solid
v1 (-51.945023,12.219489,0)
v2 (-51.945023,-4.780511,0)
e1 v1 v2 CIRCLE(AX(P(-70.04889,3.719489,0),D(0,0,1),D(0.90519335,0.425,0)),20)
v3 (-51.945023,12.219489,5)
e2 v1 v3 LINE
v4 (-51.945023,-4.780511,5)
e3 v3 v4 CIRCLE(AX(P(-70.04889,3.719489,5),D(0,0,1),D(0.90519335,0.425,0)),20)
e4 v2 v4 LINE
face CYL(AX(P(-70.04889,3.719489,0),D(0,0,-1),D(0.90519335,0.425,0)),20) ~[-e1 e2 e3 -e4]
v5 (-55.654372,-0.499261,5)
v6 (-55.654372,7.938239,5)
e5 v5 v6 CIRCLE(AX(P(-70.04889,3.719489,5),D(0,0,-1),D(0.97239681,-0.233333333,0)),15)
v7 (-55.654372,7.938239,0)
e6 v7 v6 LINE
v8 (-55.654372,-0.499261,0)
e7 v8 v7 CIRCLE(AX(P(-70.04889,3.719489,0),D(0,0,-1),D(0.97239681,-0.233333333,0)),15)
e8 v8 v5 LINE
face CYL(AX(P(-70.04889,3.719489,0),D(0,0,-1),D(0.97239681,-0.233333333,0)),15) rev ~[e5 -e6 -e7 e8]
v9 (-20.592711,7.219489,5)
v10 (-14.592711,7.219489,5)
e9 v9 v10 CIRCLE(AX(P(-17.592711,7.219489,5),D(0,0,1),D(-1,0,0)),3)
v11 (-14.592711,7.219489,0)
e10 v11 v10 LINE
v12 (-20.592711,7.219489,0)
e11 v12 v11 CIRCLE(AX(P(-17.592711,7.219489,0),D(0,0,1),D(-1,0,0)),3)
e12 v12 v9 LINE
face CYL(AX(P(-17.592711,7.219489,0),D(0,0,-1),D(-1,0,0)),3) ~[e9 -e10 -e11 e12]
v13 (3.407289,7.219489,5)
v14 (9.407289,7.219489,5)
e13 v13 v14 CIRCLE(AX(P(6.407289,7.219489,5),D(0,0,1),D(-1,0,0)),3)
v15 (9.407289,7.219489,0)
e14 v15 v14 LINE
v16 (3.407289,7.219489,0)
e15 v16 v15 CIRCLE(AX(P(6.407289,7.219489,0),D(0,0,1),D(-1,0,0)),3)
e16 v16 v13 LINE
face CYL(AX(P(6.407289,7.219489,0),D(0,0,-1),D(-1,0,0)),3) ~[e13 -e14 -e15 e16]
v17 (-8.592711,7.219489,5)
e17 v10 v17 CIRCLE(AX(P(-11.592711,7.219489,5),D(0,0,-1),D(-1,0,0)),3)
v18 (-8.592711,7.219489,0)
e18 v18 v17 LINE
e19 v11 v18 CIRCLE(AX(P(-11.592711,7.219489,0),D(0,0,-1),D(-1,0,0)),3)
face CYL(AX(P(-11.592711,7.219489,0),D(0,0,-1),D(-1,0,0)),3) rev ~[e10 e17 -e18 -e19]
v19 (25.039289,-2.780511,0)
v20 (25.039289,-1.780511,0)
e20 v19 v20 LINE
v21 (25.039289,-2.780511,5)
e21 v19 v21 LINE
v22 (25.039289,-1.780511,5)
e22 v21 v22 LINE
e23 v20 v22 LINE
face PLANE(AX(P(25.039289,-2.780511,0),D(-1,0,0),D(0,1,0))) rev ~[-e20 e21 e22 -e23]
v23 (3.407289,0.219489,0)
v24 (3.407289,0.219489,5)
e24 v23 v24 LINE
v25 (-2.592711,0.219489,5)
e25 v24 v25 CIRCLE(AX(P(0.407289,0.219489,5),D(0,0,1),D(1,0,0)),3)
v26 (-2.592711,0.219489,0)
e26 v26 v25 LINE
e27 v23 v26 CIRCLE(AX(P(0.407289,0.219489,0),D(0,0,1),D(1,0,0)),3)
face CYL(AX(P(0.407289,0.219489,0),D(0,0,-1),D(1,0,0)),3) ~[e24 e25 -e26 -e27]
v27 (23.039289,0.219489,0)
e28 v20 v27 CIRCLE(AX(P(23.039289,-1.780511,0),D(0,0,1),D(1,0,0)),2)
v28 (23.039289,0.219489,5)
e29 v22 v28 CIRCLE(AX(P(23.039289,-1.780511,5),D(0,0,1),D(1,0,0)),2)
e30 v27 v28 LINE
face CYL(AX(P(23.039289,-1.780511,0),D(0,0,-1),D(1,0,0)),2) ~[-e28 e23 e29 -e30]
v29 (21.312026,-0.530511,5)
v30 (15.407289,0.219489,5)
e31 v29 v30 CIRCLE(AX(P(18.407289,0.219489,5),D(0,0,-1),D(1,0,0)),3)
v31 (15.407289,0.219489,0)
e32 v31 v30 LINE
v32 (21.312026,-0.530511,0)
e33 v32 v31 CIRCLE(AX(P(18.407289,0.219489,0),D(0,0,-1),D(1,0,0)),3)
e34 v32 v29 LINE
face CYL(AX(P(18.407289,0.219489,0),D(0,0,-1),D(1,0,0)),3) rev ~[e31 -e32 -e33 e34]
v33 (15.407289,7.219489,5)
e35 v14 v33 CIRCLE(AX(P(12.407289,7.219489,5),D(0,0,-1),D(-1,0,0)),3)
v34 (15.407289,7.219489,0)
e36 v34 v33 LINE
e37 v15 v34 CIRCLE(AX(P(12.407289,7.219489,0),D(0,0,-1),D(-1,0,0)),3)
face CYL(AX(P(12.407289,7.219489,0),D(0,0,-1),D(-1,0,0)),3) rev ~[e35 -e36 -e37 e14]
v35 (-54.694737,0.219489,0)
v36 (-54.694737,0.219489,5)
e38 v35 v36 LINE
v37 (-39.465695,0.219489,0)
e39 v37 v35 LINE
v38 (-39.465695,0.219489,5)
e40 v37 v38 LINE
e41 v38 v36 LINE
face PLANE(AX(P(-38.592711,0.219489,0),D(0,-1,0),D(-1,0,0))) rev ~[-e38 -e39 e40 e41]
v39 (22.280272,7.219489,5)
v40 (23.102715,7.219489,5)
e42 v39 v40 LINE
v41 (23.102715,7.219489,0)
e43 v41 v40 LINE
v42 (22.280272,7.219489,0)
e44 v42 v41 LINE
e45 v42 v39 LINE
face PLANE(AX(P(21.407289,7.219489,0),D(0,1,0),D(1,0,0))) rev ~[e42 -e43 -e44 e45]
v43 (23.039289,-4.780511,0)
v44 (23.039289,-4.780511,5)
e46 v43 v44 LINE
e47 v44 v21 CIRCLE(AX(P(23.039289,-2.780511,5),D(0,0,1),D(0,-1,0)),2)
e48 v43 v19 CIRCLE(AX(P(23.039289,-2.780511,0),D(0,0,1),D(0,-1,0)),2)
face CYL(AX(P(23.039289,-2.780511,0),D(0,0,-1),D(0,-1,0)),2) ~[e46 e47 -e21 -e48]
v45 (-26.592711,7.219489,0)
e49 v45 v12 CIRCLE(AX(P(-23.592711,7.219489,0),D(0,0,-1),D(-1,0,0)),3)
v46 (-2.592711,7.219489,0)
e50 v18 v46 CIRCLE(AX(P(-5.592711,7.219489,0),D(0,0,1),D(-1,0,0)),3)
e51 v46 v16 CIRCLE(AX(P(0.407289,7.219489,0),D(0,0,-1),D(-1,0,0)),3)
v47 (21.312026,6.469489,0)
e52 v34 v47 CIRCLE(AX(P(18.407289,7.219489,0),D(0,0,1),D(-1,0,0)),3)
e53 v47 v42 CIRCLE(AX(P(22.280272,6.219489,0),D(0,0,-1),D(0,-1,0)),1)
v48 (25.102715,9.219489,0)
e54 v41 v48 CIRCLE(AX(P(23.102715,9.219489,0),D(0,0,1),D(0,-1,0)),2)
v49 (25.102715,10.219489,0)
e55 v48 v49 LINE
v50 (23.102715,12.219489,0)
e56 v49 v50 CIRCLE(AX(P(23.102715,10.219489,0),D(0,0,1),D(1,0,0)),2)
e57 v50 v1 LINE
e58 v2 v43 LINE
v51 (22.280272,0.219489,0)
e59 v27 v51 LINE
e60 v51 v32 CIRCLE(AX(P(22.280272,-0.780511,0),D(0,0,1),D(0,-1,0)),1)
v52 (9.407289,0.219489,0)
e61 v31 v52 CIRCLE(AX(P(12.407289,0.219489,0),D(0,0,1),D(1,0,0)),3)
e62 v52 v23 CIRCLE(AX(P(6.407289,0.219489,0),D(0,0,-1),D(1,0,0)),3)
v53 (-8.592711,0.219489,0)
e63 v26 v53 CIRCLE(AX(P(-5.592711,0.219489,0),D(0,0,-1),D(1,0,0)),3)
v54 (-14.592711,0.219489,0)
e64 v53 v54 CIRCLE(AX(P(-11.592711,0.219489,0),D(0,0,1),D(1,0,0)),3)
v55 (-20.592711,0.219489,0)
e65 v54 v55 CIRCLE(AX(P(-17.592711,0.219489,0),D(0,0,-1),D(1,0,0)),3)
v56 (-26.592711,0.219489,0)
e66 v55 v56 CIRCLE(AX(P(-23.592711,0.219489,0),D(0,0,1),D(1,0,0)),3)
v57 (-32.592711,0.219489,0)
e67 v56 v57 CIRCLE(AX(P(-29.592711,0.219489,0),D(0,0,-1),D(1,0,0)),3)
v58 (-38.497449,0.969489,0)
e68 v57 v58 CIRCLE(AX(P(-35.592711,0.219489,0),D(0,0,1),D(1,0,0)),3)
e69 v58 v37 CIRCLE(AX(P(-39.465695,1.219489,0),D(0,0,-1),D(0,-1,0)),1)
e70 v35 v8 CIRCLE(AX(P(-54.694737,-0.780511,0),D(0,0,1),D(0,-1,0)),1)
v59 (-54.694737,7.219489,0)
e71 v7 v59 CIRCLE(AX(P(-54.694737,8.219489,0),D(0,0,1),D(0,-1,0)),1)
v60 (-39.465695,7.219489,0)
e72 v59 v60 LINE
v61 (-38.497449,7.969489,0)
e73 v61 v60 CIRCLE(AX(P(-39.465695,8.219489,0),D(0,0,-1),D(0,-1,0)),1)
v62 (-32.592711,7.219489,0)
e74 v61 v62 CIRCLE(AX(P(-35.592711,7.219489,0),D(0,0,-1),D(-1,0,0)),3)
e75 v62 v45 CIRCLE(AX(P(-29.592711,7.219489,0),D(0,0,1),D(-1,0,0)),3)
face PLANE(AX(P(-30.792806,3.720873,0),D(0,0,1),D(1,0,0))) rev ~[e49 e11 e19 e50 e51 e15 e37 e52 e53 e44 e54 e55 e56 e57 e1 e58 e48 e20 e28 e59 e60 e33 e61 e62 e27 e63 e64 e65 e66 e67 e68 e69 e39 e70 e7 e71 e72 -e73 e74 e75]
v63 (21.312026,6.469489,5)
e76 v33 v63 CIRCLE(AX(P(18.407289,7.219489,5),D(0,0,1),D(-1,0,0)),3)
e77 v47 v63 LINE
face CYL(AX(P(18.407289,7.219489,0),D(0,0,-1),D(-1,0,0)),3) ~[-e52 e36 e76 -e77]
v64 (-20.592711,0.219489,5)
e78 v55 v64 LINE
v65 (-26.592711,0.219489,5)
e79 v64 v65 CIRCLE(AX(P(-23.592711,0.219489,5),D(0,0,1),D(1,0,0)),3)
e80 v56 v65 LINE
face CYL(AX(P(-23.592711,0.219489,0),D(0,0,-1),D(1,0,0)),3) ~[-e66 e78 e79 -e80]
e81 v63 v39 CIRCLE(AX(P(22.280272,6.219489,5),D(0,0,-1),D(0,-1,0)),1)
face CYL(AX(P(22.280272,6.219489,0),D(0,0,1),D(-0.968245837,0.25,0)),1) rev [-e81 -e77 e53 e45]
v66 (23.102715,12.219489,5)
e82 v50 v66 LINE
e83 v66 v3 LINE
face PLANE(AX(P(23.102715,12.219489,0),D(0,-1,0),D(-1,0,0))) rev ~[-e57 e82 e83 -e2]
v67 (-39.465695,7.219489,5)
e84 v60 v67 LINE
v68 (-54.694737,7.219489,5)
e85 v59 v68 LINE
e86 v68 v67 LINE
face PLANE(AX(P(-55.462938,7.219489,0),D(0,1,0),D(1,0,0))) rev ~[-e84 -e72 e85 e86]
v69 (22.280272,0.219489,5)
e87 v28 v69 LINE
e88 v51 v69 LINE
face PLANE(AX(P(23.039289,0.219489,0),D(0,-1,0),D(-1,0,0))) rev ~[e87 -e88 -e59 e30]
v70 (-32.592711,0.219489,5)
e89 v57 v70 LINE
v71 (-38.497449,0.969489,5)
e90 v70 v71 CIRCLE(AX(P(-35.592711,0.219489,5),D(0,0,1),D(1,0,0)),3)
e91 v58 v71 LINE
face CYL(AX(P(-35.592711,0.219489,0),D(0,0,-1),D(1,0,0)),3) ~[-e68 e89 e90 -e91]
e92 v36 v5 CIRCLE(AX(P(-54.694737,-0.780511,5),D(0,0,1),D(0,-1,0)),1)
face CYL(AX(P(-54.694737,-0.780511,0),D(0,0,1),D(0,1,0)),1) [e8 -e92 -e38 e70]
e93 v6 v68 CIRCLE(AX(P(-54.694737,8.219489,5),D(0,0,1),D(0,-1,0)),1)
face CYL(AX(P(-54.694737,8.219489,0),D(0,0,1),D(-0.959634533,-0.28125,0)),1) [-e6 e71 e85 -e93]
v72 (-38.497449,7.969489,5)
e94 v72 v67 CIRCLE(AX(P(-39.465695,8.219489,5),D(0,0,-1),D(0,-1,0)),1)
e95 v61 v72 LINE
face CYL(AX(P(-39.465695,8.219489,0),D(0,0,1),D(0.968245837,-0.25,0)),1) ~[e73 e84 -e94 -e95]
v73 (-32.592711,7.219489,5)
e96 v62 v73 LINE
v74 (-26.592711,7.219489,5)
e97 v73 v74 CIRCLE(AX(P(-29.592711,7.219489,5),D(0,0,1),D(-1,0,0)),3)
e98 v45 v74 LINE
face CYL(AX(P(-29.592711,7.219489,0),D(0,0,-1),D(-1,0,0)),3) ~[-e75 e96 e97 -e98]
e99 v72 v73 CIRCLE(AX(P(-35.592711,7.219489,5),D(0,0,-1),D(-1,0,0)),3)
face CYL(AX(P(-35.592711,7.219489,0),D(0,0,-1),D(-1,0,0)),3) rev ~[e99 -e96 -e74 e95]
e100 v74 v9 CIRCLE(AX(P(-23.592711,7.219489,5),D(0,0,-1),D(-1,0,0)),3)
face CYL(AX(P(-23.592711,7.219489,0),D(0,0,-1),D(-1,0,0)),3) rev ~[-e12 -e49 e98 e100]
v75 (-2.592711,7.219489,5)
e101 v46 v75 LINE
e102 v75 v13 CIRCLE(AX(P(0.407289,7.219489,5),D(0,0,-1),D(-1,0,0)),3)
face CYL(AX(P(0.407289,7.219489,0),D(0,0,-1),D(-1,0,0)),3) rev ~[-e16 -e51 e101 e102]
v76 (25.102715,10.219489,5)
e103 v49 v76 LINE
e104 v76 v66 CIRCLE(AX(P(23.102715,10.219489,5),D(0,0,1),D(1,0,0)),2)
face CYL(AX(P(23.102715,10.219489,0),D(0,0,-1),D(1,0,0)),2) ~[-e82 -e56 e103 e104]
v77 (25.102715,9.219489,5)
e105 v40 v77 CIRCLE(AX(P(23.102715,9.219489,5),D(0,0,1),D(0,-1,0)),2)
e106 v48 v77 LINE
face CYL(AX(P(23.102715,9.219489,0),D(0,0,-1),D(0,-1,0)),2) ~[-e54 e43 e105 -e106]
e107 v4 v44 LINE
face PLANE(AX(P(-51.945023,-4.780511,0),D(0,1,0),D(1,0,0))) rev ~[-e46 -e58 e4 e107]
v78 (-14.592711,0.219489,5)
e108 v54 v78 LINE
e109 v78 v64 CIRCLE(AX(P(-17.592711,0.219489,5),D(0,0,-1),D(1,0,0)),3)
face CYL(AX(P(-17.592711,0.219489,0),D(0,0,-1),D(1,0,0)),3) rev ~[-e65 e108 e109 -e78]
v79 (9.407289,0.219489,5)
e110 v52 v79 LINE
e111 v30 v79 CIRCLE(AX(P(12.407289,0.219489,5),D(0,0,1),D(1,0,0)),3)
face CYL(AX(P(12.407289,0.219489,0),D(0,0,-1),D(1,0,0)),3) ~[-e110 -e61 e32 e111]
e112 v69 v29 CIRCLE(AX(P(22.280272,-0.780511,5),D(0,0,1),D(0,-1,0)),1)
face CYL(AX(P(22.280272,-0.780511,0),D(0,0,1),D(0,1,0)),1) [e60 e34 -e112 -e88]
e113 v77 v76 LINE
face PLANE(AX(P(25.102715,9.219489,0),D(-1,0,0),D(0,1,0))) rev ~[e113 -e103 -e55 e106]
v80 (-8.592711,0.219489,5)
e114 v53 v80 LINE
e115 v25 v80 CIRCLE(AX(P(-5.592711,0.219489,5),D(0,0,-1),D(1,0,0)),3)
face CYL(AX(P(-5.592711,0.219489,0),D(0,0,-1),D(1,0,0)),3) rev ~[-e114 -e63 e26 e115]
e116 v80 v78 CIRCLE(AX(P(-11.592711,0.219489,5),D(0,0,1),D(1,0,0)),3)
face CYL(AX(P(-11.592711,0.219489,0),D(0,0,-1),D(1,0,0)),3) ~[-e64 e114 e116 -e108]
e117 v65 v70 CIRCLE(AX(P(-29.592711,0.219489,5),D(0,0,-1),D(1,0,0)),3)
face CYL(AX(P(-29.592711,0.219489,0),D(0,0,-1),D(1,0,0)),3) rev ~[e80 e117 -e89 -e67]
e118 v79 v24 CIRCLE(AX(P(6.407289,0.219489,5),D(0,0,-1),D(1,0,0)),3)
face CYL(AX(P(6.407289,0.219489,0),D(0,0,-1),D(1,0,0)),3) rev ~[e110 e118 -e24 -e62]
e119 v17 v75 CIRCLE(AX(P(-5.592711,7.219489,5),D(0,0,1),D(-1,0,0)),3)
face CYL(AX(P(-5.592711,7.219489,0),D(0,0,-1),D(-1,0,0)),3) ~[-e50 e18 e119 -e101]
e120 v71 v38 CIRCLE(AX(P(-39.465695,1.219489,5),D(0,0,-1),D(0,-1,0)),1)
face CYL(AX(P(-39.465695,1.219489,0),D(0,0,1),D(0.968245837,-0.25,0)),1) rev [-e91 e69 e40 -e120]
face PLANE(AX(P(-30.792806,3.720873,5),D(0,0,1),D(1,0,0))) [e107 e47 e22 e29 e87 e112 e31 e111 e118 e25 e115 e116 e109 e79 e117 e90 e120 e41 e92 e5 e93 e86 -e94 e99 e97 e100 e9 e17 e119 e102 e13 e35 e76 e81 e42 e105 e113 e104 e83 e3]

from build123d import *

# Parameters (mm, degrees)
F1_DEPTH = 5
F2_R     = 1


with BuildPart() as f1:
    # F0 (on Top) → F1 (new body)
    with BuildSketch(Plane.XY):
        with BuildLine():
            ThreePointArc((-38.5927113062, 7.2194887325), (-35.5927113062, 10.2194887325), (-32.5927113062, 7.2194887325))
            ThreePointArc((-32.5927113062, 7.2194887325), (-29.5927113062, 4.2194887325), (-26.5927113062, 7.2194887325))
            ThreePointArc((-26.5927113062, 7.2194887325), (-23.5927113062, 10.2194887325), (-20.5927113062, 7.2194887325))
            ThreePointArc((-20.5927113062, 7.2194887325), (-17.5927113062, 4.2194887325), (-14.5927113062, 7.2194887325))
            ThreePointArc((-14.5927113062, 7.2194887325), (-11.5927113062, 10.2194887325), (-8.5927113062, 7.2194887325))
            ThreePointArc((-8.5927113062, 7.2194887325), (-5.5927113062, 4.2194887325), (-2.5927113062, 7.2194887325))
            ThreePointArc((-2.5927113062, 7.2194887325), (0.4072886938, 10.2194887325), (3.4072886938, 7.2194887325))
            ThreePointArc((3.4072886938, 7.2194887325), (6.4072886938, 4.2194887325), (9.4072886938, 7.2194887325))
            ThreePointArc((9.4072886938, 7.2194887325), (12.4072886938, 10.2194887325), (15.4072886938, 7.2194887325))
            ThreePointArc((15.4072886938, 7.2194887325), (18.4072886938, 4.2194887325), (21.4072886938, 7.2194887325))
            Line((21.4072886938, 7.2194887325), (23.1027154343, 7.2194887325))
            ThreePointArc((23.1027154343, 7.2194887325), (24.5169289967, 7.8052751701), (25.1027154343, 9.2194887325))
            Line((25.1027154343, 9.2194887325), (25.1027154343, 10.2194887325))
            ThreePointArc((25.1027154343, 10.2194887325), (24.5169289967, 11.6337022949), (23.1027154343, 12.2194887325))
            Line((23.1027154343, 12.2194887325), (-51.9450229577, 12.2194887325))
            ThreePointArc((-51.9450229577, 12.2194887325), (-90.0488899479, 3.7194887325), (-51.9450229577, -4.7805112675))
            Line((-51.9450229577, -4.7805112675), (23.0392886417, -4.7805112675))
            ThreePointArc((23.0392886417, -4.7805112675), (24.4535022041, -4.1947248299), (25.0392886417, -2.7805112675))
            Line((25.0392886417, -2.7805112675), (25.0392886417, -1.7805112675))
            ThreePointArc((25.0392886417, -1.7805112675), (24.4535022041, -0.3662977051), (23.0392886417, 0.2194887325))
            Line((23.0392886417, 0.2194887325), (21.4072886938, 0.2194887325))
            ThreePointArc((21.4072886938, 0.2194887325), (18.4072886938, -2.7805112675), (15.4072886938, 0.2194887325))
            ThreePointArc((15.4072886938, 0.2194887325), (12.4072886938, 3.2194887325), (9.4072886938, 0.2194887325))
            ThreePointArc((9.4072886938, 0.2194887325), (6.4072886938, -2.7805112675), (3.4072886938, 0.2194887325))
            ThreePointArc((3.4072886938, 0.2194887325), (0.4072886938, 3.2194887325), (-2.5927113062, 0.2194887325))
            ThreePointArc((-2.5927113062, 0.2194887325), (-5.5927113062, -2.7805112675), (-8.5927113062, 0.2194887325))
            ThreePointArc((-8.5927113062, 0.2194887325), (-11.5927113062, 3.2194887325), (-14.5927113062, 0.2194887325))
            ThreePointArc((-14.5927113062, 0.2194887325), (-17.5927113062, -2.7805112675), (-20.5927113062, 0.2194887325))
            ThreePointArc((-20.5927113062, 0.2194887325), (-23.5927113062, 3.2194887325), (-26.5927113062, 0.2194887325))
            ThreePointArc((-26.5927113062, 0.2194887325), (-29.5927113062, -2.7805112675), (-32.5927113062, 0.2194887325))
            ThreePointArc((-32.5927113062, 0.2194887325), (-35.5927113062, 3.2194887325), (-38.5927113062, 0.2194887325))
            Line((-38.5927113062, 0.2194887325), (-55.4629378021, 0.2194887325))
            ThreePointArc((-55.4629378021, 0.2194887325), (-85.0488899479, 3.7194887325), (-55.4629378021, 7.2194887325))
            Line((-55.4629378021, 7.2194887325), (-38.5927113062, 7.2194887325))
        make_face()
    extrude(amount=F1_DEPTH)

    # F2
    f2_edges = [f1.edges().sort_by_distance(p)[0] for p in [
        (-55.462938, 7.219489, 2.5),
        (-38.592711, 7.219489, 2.5),
        (-38.592711, 0.219489, 2.5),
        (-55.462938, 0.219489, 2.5),
        (21.407289, 0.219489, 2.5),
        (21.407289, 7.219489, 2.5),
    ]]
    fillet(f2_edges, radius=F2_R)


solid = f1.part
